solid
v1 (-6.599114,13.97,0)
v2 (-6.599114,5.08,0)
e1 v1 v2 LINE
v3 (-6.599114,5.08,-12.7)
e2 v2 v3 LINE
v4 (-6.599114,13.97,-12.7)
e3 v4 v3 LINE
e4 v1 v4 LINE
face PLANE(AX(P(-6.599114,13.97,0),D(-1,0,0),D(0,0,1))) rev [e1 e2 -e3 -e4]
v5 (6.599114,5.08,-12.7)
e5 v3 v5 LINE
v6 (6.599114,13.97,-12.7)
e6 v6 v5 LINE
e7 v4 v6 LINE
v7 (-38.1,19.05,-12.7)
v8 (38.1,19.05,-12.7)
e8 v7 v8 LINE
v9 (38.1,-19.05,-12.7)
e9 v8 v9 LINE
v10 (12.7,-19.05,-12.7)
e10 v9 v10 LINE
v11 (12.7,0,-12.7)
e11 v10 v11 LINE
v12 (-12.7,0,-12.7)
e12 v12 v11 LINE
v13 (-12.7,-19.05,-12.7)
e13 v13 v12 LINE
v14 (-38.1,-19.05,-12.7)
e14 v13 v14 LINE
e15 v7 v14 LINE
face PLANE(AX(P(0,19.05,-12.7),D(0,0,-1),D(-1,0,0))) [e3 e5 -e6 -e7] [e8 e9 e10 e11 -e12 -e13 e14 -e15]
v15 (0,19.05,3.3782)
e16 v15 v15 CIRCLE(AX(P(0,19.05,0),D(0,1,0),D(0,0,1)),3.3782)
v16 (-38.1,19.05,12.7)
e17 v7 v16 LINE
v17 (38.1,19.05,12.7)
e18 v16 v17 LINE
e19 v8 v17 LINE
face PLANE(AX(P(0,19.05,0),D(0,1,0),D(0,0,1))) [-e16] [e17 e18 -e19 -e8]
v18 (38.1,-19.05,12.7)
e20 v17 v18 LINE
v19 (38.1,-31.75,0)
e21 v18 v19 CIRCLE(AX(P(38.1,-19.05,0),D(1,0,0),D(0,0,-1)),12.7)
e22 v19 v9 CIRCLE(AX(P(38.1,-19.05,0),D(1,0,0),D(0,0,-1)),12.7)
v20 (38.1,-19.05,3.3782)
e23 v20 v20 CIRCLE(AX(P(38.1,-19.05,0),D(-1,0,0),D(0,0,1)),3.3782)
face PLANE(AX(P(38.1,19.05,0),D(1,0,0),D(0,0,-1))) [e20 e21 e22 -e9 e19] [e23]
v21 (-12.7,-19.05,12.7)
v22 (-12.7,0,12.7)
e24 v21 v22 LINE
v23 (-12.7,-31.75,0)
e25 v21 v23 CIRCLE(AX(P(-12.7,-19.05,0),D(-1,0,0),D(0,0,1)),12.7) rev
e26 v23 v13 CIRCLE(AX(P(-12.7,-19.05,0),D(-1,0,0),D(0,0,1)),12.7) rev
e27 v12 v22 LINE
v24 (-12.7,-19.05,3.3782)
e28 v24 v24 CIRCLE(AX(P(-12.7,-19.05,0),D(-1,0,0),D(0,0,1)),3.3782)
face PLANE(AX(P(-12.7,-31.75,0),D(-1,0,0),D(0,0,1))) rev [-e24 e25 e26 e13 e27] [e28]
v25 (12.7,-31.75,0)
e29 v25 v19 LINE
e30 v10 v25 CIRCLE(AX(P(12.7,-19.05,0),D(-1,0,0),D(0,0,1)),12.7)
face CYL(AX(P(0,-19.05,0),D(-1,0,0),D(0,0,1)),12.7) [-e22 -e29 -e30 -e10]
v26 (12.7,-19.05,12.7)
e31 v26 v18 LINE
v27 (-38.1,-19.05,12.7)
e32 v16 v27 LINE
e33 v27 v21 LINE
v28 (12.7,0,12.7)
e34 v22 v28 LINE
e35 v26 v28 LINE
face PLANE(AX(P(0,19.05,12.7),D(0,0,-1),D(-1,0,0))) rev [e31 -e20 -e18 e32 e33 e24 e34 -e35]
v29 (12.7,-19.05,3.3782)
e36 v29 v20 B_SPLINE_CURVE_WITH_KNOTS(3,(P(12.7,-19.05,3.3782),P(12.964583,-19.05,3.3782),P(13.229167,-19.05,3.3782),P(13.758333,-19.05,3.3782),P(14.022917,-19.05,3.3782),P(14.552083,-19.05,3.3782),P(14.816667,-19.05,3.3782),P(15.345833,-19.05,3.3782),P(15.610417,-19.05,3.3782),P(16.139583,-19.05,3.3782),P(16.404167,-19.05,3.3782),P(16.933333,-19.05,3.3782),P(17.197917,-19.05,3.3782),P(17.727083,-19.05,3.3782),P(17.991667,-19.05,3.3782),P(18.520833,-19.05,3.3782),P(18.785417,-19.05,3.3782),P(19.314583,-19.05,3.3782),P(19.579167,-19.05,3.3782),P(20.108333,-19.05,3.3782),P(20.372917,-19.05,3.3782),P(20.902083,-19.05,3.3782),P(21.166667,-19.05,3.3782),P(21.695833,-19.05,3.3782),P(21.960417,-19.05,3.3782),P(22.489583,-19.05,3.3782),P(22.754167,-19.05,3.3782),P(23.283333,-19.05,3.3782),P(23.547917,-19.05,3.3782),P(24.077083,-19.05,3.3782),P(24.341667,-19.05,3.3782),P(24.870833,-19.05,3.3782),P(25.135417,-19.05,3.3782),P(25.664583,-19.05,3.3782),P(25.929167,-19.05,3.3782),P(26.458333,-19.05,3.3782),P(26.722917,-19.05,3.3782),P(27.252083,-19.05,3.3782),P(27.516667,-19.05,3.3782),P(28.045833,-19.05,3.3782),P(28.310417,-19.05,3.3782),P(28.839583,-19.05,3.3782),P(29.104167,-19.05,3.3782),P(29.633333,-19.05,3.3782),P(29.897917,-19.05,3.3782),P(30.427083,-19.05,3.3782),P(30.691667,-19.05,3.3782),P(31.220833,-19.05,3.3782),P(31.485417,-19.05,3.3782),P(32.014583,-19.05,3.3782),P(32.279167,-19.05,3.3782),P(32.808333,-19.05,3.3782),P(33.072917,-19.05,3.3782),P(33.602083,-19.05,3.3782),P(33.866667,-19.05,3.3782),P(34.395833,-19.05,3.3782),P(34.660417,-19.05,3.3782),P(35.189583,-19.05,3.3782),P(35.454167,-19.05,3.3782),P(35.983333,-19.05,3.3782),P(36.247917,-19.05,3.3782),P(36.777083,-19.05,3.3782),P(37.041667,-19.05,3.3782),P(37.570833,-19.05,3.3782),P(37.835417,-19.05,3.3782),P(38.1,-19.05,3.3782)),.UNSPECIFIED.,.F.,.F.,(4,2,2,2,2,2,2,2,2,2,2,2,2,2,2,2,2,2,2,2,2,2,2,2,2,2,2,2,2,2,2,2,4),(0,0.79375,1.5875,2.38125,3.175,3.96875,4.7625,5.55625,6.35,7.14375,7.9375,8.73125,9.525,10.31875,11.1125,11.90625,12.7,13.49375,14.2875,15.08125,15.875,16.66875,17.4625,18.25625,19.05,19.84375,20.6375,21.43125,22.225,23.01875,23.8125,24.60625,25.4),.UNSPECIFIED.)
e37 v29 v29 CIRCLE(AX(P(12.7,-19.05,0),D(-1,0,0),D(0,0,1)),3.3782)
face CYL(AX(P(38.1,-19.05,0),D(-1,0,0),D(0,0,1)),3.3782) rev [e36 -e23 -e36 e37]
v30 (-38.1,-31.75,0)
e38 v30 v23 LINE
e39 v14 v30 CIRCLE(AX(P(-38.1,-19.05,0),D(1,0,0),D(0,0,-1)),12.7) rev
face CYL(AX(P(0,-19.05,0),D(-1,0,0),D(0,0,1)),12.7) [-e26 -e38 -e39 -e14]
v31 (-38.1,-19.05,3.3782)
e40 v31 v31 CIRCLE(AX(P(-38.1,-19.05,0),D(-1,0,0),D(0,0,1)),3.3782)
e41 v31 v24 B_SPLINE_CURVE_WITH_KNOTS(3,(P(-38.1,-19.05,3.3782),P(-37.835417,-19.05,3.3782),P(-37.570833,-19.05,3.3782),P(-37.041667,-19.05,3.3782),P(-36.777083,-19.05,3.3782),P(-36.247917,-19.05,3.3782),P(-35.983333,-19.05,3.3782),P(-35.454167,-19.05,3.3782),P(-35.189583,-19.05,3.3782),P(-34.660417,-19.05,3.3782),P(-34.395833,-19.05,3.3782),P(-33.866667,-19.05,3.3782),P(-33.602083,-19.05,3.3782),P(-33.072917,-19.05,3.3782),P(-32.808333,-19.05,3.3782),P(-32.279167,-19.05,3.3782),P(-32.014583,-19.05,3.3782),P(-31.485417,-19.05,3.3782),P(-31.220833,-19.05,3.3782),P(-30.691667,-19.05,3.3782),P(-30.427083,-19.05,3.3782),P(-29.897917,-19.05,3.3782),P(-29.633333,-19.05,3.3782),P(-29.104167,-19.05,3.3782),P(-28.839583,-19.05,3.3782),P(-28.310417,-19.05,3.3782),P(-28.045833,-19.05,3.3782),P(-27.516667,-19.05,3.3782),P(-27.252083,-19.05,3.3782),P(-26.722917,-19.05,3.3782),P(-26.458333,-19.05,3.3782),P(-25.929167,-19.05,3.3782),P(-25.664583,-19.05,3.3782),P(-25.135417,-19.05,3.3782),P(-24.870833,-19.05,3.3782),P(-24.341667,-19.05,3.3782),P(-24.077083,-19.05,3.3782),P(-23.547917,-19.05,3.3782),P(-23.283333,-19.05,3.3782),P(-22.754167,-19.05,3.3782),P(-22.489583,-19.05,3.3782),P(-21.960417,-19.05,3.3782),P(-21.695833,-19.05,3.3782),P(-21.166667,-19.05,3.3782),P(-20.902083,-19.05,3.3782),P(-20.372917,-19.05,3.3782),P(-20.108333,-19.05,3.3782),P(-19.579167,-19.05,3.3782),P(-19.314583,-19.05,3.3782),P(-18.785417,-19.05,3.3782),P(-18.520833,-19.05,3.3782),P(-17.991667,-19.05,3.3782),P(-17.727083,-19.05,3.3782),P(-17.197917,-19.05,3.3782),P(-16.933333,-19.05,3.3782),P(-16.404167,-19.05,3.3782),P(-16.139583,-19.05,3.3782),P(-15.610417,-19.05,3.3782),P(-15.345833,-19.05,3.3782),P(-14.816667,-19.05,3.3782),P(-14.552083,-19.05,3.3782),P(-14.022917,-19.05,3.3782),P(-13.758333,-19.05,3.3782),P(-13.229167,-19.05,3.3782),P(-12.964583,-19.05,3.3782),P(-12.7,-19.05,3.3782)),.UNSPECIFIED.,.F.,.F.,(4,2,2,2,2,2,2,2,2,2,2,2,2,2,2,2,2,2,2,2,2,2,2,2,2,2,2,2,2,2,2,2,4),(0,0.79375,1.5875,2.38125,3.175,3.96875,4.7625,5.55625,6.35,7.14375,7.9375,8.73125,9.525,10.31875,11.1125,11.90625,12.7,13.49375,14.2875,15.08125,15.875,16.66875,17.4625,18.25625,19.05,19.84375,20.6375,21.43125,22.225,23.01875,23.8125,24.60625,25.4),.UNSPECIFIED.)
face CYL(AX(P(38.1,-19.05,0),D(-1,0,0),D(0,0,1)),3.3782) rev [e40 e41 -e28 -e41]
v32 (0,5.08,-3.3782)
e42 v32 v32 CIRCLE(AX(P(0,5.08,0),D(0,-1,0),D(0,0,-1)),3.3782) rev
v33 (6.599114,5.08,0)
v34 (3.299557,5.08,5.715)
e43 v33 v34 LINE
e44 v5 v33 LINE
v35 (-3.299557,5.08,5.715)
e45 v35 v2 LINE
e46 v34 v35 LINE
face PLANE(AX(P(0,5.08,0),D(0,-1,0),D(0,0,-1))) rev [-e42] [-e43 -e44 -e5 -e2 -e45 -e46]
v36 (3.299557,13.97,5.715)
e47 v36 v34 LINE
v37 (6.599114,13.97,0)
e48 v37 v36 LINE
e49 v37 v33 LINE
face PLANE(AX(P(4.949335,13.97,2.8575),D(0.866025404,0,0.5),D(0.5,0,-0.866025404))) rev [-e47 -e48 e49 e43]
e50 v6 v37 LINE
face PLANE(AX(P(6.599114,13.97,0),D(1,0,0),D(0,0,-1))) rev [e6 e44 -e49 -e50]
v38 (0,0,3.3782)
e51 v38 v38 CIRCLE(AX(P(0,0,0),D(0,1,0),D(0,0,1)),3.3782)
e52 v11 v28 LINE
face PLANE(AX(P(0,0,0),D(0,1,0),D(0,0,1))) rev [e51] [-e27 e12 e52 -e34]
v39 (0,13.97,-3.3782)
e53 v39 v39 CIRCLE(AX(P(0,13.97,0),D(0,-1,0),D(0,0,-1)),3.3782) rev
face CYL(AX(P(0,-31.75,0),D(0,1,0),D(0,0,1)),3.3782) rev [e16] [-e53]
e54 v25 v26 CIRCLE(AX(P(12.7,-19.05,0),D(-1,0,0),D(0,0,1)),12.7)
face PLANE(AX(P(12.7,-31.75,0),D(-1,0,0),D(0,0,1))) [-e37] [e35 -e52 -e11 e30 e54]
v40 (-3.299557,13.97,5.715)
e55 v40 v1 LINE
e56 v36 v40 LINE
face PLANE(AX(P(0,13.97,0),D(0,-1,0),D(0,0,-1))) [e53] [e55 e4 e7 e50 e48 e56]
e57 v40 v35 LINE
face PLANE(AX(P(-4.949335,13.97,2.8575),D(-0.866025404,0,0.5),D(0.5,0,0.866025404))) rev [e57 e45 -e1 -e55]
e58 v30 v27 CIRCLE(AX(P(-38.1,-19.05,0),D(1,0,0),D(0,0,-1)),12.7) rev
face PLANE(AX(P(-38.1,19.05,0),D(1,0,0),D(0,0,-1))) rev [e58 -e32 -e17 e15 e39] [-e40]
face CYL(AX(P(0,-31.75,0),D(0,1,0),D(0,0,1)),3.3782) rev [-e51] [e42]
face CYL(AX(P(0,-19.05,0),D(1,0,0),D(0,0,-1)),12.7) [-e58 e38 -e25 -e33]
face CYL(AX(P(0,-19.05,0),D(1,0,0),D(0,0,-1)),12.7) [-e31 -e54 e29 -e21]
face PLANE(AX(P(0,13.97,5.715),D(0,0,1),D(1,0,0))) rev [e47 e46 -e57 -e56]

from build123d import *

# Parameters (mm, degrees)
SKETCH1_W           = 76.2
SKETCH1_H           = 25.4
BOSS_EXTRUDE1_DEPTH = 19.05
SKETCH1_7_W         = 25.4
SKETCH1_7_H         = 25.4
BOSS_EXTRUDE3_DEPTH = 31.75
CUT_EXTRUDE4_DEPTH  = 84.521209881
FILLET1_R           = 12.7
SKETCH3_R           = 3.3782
CUT_EXTRUDE5_DEPTH  = 65.757547823
CUT_EXTRUDE6_DEPTH  = 4.445


with BuildPart() as part:
    # Sketch1 → Boss-Extrude1 (new body)
    with BuildSketch(Plane(origin=(0, 0, 0), x_dir=(1, 0, 0), z_dir=(0, 1, 0))):
        Rectangle(SKETCH1_W, SKETCH1_H)
    extrude(amount=BOSS_EXTRUDE1_DEPTH)

    # Sketch1<7> → Boss-Extrude3 (add)
    with BuildSketch(Plane(origin=(0, 0, 0), x_dir=(1, 0, 0), z_dir=(0, 1, 0))):
        with Locations((-25.4, 0)):
            Rectangle(SKETCH1_7_W, SKETCH1_7_H)
        with Locations((25.4, 0)):
            Rectangle(SKETCH1_7_W, SKETCH1_7_H)
    extrude(amount=-BOSS_EXTRUDE3_DEPTH)

    # Sketch2 → Cut-Extrude4 (cut, through all)
    with BuildSketch(Plane.ZY.offset(38.1)):
        with BuildLine():
            ThreePointArc((3.3782, -19.05), (2.388748128, -16.661251872), (0, -15.6718))
            Line((0, -15.6718), (0, -22.4282))
            ThreePointArc((0, -22.4282), (2.388748128, -21.438748128), (3.3782, -19.05))
        make_face()
        with BuildLine():
            Line((0, -22.4282), (0, -15.6718))
            ThreePointArc((0, -15.6718), (-3.3782, -19.05), (0, -22.4282))
        make_face()
    extrude(amount=-CUT_EXTRUDE4_DEPTH, mode=Mode.SUBTRACT)

    # Fillet1
    fillet1_edges = [part.edges().sort_by_distance(p)[0] for p in [
        (-25.4, -31.75, 12.7),
        (25.4, -31.75, 12.7),
        (25.4, -31.75, -12.7),
        (-25.4, -31.75, -12.7),
    ]]
    fillet(fillet1_edges, radius=FILLET1_R - 0.0001)  # a hair under: the kernel refuses the full size

    # Sketch3 → Cut-Extrude5 (cut, through all)
    with BuildSketch(Plane(origin=(0, 19.05, 0), x_dir=(1, 0, 0), z_dir=(0, 1, 0))):
        with Locations(Location((0, 0, 0), (0, 0, 270))):
            Circle(SKETCH3_R)
    extrude(amount=-CUT_EXTRUDE5_DEPTH, mode=Mode.SUBTRACT)

    # Sketch4 → Cut-Extrude6 (cut, symmetric)
    with BuildSketch(Plane(origin=(0, 9.525, 0), x_dir=(-1, 0, 0), z_dir=(0, -1, 0))):
        Polygon((6.599113577, 12.7), (-6.599113577, 12.7), (-6.599113577, 0), (-3.299556788, 5.715), (3.299556788, 5.715), (6.599113577, 0), align=None)
        Polygon((-6.599113577, 0), (-3.299556788, -5.715), (3.299556788, -5.715), (6.599113577, 0), (3.299556788, 5.715), (-3.299556788, 5.715), align=None)
    extrude(amount=CUT_EXTRUDE6_DEPTH, both=True, mode=Mode.SUBTRACT)


solid = part.part
